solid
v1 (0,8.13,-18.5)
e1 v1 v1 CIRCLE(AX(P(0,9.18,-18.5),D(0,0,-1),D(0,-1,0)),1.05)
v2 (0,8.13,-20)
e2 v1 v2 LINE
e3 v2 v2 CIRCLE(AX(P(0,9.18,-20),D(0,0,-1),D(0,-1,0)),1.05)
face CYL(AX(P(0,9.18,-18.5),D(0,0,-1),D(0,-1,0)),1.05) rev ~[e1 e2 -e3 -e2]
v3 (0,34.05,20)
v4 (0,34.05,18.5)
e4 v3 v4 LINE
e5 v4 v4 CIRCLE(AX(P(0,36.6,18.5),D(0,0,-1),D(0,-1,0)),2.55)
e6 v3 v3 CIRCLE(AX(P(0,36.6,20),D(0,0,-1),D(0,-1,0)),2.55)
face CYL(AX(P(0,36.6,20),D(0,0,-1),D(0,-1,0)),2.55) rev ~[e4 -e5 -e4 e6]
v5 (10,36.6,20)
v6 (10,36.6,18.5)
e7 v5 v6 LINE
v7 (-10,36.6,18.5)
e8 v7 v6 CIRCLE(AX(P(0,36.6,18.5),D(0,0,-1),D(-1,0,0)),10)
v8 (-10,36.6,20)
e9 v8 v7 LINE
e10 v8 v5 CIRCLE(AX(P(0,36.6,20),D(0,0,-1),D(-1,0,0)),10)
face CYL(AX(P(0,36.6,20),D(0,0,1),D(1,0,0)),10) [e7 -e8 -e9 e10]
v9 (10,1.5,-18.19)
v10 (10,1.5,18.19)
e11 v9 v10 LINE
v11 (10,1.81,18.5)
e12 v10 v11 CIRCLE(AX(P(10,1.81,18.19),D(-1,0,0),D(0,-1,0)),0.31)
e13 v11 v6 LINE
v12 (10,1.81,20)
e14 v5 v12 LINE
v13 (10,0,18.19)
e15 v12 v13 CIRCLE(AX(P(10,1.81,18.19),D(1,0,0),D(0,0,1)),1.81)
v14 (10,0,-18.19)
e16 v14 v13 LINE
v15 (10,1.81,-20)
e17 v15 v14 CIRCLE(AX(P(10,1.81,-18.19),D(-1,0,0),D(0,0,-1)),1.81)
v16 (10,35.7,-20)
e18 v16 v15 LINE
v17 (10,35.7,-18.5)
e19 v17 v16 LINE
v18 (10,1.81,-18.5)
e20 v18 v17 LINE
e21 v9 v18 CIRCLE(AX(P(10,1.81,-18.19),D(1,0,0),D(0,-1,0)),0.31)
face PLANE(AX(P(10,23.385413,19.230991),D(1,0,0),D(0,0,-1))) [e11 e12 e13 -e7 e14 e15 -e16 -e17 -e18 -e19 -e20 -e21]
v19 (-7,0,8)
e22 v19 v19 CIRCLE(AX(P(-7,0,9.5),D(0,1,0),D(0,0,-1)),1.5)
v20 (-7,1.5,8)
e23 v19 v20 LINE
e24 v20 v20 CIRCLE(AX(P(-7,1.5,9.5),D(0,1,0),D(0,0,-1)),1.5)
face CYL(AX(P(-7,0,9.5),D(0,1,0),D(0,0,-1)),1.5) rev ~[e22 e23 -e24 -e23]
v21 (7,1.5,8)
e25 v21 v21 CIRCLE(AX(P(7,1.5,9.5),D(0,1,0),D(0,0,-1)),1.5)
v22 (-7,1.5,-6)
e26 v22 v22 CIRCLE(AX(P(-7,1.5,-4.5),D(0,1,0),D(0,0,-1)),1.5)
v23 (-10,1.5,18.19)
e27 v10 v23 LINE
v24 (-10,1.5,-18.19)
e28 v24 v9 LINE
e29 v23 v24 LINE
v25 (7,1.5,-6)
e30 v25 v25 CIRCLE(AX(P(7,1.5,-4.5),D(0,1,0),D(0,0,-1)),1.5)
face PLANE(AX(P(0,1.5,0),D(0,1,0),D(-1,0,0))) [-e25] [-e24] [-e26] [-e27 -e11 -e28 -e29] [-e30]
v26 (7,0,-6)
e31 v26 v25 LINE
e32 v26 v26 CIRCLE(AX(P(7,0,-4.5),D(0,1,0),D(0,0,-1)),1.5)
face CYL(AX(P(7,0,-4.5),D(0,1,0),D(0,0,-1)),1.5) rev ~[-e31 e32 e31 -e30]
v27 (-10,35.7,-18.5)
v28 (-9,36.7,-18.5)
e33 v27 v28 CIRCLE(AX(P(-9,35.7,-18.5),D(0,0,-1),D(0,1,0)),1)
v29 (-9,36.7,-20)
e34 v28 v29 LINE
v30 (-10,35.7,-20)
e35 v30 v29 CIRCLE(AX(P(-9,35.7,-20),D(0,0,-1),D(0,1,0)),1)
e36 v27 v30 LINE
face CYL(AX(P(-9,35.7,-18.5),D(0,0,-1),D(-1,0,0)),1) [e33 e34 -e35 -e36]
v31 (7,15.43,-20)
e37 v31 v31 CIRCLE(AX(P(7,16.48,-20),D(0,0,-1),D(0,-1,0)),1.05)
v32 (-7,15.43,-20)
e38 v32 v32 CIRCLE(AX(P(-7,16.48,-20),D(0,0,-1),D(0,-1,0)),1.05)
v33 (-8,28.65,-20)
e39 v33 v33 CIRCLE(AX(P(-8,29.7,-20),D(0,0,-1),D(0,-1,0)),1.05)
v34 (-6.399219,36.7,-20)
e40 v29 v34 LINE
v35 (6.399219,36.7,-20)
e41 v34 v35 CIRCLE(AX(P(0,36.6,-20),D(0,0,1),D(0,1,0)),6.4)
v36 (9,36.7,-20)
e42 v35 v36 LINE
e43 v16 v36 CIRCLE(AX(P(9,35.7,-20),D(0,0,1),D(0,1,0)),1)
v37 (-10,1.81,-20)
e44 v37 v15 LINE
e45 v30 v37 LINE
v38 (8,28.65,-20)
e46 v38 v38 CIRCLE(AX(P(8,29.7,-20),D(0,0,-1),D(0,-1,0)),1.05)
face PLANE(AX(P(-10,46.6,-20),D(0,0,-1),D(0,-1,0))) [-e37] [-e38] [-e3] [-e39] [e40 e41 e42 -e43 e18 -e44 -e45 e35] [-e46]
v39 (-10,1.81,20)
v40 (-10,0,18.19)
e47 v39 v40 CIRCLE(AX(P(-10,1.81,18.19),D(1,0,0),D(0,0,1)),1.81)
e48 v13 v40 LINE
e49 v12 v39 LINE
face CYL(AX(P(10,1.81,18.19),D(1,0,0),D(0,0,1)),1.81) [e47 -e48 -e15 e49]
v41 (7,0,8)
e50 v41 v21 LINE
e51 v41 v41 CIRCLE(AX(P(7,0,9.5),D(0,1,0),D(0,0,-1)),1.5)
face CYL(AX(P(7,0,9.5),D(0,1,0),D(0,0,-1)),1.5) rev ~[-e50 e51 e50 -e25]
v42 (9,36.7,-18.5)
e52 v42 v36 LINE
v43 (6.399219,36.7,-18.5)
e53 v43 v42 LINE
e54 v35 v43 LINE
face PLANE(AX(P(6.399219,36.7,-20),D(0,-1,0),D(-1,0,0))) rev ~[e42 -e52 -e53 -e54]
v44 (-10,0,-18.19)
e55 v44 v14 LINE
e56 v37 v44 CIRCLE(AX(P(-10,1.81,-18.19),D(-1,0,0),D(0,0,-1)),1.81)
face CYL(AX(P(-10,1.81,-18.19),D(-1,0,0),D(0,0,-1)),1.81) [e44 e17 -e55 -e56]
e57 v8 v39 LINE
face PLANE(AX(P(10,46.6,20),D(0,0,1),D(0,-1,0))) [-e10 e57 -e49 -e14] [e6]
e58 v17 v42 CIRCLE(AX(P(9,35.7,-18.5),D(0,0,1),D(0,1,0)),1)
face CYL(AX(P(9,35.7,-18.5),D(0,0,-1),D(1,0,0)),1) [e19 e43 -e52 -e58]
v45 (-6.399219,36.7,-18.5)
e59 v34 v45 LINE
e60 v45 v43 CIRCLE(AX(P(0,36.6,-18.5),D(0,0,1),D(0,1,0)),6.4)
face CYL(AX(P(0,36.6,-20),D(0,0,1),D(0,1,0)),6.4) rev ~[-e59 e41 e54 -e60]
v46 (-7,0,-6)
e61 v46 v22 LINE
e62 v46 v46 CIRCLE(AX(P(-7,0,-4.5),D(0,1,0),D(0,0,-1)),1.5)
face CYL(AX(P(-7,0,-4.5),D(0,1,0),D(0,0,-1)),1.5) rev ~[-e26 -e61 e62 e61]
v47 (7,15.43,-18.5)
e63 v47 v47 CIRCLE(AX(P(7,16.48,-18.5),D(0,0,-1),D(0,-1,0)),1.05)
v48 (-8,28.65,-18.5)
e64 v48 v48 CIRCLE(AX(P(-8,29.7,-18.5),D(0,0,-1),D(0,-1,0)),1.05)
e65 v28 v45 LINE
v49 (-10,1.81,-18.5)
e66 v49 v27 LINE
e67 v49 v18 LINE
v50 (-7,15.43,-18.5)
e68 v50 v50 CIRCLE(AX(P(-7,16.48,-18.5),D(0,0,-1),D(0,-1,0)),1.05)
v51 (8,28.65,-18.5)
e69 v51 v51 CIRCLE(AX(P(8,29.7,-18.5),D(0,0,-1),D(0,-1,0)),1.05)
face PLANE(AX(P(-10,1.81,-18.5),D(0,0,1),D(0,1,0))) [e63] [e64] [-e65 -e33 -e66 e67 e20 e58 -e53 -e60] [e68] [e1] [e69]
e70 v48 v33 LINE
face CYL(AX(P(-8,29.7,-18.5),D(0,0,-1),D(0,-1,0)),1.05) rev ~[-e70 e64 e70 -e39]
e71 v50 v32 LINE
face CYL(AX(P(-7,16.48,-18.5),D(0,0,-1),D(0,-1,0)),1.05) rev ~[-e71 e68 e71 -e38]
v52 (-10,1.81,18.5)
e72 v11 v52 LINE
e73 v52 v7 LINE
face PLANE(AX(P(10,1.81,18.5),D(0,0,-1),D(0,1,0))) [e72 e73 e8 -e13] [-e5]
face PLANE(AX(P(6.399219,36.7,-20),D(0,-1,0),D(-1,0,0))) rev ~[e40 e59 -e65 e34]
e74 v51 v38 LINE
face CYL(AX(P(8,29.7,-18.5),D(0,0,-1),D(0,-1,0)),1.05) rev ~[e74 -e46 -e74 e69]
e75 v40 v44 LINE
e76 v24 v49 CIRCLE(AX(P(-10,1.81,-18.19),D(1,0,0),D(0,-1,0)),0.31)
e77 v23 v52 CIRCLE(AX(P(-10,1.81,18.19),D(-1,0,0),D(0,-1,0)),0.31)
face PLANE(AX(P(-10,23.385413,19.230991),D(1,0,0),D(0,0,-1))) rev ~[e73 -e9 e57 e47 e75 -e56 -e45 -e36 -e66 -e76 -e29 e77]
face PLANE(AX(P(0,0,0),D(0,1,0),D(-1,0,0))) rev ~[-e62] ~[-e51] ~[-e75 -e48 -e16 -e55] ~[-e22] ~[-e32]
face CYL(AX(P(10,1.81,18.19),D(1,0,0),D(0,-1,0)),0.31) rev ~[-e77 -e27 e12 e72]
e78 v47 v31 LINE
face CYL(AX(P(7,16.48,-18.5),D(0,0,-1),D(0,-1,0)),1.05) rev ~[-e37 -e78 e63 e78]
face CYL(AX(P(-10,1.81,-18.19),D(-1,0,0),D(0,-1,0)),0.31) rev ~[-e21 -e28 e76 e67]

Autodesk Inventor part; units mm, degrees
ref_plane "YZ Plane" through (0, 0, 0) normal (1, 0, 0) x (0, 1, 0)
ref_plane "XZ Plane" through (0, 0, 0) normal (0, 1, 0) x (-1, 0, 0)
ref_plane "XY Plane" through (0, 0, 0) normal (0, 0, 1) x (1, 0, 0)
sketch "Sketch1" plane through (0, 0, 0) normal (0, 1, 0) x (-1, 0, 0)
  line L0 (10, -18.5) -> (-10, -18.5)
  line L1 (-10, -18.5) -> (-10, 18.5)
  line L2 (-10, 18.5) -> (10, 18.5)
  line L3 (10, 18.5) -> (10, -18.5)
  point P0 (0, 0)
  dimension "d0" = 20
  dimension "d1" = 37
  dimension "d2" = 18.5
  dimension "d3" = 10
extrude "Plate1" add sketch "Sketch1" along normal blind 1.5
sketch "Sketch2" plane through (-10, 0, -20) normal (0, 0, 1) x (1, 0, 0)
  line L0 (20, 0) -> (0, 0)
  line L1 (0, 0) -> (0, 46.6)
  line L2 (0, 46.6) -> (20, 46.6)
  line L3 (20, 46.6) -> (20, 0)
edge flange "Flange1" height 46.6 angle 90 thickness 1.5 bend radius 0.31 thickness toward (0, 0, 1) relief tear relief width 1.5 relief depth 0.75 edges at (0, 1.5, -18.5) wall of the first edge with corners at (10, 0, -20) (-10, 0, -20) (-10, 46.6, -20) (10, 46.6, -20)
bend "Bend1"
corner "Corner1"
sketch "Sketch3" plane through (10, 0, 20) normal (0, 0, -1) x (-1, 0, 0)
  line L0 (20, 0) -> (0, 0)
  line L1 (0, 0) -> (0, 46.6)
  line L2 (0, 46.6) -> (20, 46.6)
  line L3 (20, 46.6) -> (20, 0)
edge flange "Flange2" height 46.6 angle 90 thickness 1.5 bend radius 0.31 thickness toward (0, 0, -1) relief tear relief width 1.5 relief depth 0.75 edges at (0, 1.5, 18.5) wall of the first edge with corners at (-10, 0, 20) (10, 0, 20) (10, 46.6, 20) (-10, 46.6, 20)
bend "Bend2"
corner "Corner2"
sketch "Sketch4" plane through (-10, 46.6, 20) normal (0, 0, 1) x (1, 0, 0)
  circle A0 centre (10, -10) radius 10
  line L0 (0, 0) -> (20, 0) projected
  line L1 (0, 0) -> (20, 0)
  line L2 (20, 0) -> (20, -10)
  line L3 (20, -10) -> (0, -10)
  line L4 (0, -10) -> (0, 0)
  line L5 (0, -44.79) -> (0, 0) projected
  point P0 (10, -46.6)
  point P1 (10, -10)
  point P2 (20, 0)
  point P3 (10, 0)
  point P4 (0, -10)
  point P5 (8.5893, 0)
  point P6 (0, -10)
  dimension "d26" = 20
  dimension "d25" = 10
  dimension "d27" = 10
  dimension "d28" = 10
extrude "Extrusion1" cut sketch "Sketch4" against normal blind 10 contours L4 L0 A0 | A0 L0 L2
sketch "Sketch5" plane through (10, 46.6, -20) normal (0, 0, -1) x (-1, 0, 0)
  arc A0 (20, -10) -> (0, -10) centre (10, -10) ccw projected
  point P0 (10, -46.6)
hole "Hole1" at (0, 36.6, -20) direction (0, 0, 1) diameter 12.8 depth 1.5
sketch "Sketch6" plane through (10, 46.6, -20) normal (0, 0, -1) x (-1, 0, 0)
  circle A0 centre (10, -10) radius 6.4 projected
  line L0 (0, 0) -> (20, 0) projected
  line L1 (0, -44.79) -> (0, 0) projected
  line L2 (24, 0) -> (-4, 0)
  line L3 (-4, 0) -> (-4, -9.9)
  line L4 (-4, -9.9) -> (24, -9.9)
  line L5 (24, -9.9) -> (24, 0)
  point P0 (10, -46.6)
  point P1 (20, 0)
  point P2 (6.005, 0)
  point P3 (13.995, 0)
  dimension "d38" = 9.9
  dimension "d39" = 4
  dimension "d40" = 28
extrude "Extrusion2" cut sketch "Sketch6" against normal blind 10 contours L4 A0 | A0 L4 L1 L0 L2 L5 | L4 L3 L2 L1 picked at (9.1972, -6.4205)
fillet "Fillet1" radius 1 2 edges at (-10, 36.7, -19.25) (10, 36.7, -19.25)
sketch "Sketch7" plane through (-10, 1.81, 20) normal (0, 0, 1) x (1, 0, 0)
  arc A0 (20, 34.79) -> (0, 34.79) centre (10, 34.79) ccw projected
  point P0 (10, -1.81)
hole "Hole2" at (0, 36.6, 20) direction (0, 0, -1) diameter 5.1 depth 1.5 clearance for "Hex Head Bolt" size "M5" standard "Ansi Metric M Profile"
sketch "Sketch8" plane through (0, 0, 0) normal (0, -1, 0) x (1, 0, 0)
  line L0 (2.55, 18.5) -> (-2.55, 18.5) projected
  line L1 (-10, 18.5) -> (10, 18.5) projected
  line L2 (10, 18.5) -> (-10, 18.5) projected
  line L3 (10, 18.19) -> (-10, 18.19) projected
  line L4 (-10, -18.19) -> (-10, 18.19) projected
  line L5 (-10, -18.19) -> (10, -18.19) projected
  line L6 (10, 18.19) -> (10, -18.19) projected
  point P0 (0, 0)
  point P1 (7, 9.5)
  point P2 (7, -4.5)
  point P3 (-7, 9.5)
  point P4 (-7, -4.5)
  dimension "d51" = 9
  dimension "d52" = 3
  dimension "d55" = 14
  dimension "d58" = 14
hole "Hole3" at (7, 0, 9.5) at (7, 0, -4.5) at (-7, 0, 9.5) at (-7, 0, -4.5) direction (0, 1, 0) diameter 3 depth 1.5
hole "Hole5" at (-8, 29.7, -18.5) at (8, 29.7, -18.5) at (7, 16.48, -18.5) at (-7, 16.48, -18.5) at (0, 9.18, -18.5) direction (0, 0, -1) diameter 2.1 depth 1.5
equation "\"d36\" = Thickness"
equation "\"d49\" = Thickness"
equation "\"d66\" = Thickness"
equation "\"d80\" = Thickness"
equation "\"d4\" = Thickness"
equation "\"d5\" = BendReliefWidth"
equation "\"d6\" = BendReliefDepth"
equation "\"d7\" = MinimumRemnant"
equation "\"d8\" = TransitionRadius"
equation "\"d11\" = BendRadius"
equation "\"d12\" = CornerReliefSize"
equation "\"d13\" = GapSize"
equation "\"d14\" = JacobiRadiusSize"
equation "\"d15\" = BendReliefWidth"
equation "\"d16\" = BendReliefDepth"
equation "\"d17\" = MinimumRemnant"
equation "\"d18\" = TransitionRadius"
equation "\"d21\" = BendRadius"
equation "\"d22\" = CornerReliefSize"
equation "\"d23\" = GapSize"
equation "\"d24\" = JacobiRadiusSize"
equation "\"BendReliefWidth\" = Thickness"
equation "\"BendReliefDepth\" = 0.5 * Thickness"
equation "\"CornerReliefSize\" = 4 * Thickness"
equation "\"MinimumRemnant\" = 2 * Thickness"
equation "\"TransitionRadius\" = BendRadius"
equation "\"JacobiRadiusSize\" = BendRadius"
equation "\"GapSize\" = Thickness"
equation "\"Thickness\" = 1.5"
equation "\"BendRadius\" = 0.31"
properties part number "axis_9_bottom_frame" material "Aluminum 6061-AHC"
